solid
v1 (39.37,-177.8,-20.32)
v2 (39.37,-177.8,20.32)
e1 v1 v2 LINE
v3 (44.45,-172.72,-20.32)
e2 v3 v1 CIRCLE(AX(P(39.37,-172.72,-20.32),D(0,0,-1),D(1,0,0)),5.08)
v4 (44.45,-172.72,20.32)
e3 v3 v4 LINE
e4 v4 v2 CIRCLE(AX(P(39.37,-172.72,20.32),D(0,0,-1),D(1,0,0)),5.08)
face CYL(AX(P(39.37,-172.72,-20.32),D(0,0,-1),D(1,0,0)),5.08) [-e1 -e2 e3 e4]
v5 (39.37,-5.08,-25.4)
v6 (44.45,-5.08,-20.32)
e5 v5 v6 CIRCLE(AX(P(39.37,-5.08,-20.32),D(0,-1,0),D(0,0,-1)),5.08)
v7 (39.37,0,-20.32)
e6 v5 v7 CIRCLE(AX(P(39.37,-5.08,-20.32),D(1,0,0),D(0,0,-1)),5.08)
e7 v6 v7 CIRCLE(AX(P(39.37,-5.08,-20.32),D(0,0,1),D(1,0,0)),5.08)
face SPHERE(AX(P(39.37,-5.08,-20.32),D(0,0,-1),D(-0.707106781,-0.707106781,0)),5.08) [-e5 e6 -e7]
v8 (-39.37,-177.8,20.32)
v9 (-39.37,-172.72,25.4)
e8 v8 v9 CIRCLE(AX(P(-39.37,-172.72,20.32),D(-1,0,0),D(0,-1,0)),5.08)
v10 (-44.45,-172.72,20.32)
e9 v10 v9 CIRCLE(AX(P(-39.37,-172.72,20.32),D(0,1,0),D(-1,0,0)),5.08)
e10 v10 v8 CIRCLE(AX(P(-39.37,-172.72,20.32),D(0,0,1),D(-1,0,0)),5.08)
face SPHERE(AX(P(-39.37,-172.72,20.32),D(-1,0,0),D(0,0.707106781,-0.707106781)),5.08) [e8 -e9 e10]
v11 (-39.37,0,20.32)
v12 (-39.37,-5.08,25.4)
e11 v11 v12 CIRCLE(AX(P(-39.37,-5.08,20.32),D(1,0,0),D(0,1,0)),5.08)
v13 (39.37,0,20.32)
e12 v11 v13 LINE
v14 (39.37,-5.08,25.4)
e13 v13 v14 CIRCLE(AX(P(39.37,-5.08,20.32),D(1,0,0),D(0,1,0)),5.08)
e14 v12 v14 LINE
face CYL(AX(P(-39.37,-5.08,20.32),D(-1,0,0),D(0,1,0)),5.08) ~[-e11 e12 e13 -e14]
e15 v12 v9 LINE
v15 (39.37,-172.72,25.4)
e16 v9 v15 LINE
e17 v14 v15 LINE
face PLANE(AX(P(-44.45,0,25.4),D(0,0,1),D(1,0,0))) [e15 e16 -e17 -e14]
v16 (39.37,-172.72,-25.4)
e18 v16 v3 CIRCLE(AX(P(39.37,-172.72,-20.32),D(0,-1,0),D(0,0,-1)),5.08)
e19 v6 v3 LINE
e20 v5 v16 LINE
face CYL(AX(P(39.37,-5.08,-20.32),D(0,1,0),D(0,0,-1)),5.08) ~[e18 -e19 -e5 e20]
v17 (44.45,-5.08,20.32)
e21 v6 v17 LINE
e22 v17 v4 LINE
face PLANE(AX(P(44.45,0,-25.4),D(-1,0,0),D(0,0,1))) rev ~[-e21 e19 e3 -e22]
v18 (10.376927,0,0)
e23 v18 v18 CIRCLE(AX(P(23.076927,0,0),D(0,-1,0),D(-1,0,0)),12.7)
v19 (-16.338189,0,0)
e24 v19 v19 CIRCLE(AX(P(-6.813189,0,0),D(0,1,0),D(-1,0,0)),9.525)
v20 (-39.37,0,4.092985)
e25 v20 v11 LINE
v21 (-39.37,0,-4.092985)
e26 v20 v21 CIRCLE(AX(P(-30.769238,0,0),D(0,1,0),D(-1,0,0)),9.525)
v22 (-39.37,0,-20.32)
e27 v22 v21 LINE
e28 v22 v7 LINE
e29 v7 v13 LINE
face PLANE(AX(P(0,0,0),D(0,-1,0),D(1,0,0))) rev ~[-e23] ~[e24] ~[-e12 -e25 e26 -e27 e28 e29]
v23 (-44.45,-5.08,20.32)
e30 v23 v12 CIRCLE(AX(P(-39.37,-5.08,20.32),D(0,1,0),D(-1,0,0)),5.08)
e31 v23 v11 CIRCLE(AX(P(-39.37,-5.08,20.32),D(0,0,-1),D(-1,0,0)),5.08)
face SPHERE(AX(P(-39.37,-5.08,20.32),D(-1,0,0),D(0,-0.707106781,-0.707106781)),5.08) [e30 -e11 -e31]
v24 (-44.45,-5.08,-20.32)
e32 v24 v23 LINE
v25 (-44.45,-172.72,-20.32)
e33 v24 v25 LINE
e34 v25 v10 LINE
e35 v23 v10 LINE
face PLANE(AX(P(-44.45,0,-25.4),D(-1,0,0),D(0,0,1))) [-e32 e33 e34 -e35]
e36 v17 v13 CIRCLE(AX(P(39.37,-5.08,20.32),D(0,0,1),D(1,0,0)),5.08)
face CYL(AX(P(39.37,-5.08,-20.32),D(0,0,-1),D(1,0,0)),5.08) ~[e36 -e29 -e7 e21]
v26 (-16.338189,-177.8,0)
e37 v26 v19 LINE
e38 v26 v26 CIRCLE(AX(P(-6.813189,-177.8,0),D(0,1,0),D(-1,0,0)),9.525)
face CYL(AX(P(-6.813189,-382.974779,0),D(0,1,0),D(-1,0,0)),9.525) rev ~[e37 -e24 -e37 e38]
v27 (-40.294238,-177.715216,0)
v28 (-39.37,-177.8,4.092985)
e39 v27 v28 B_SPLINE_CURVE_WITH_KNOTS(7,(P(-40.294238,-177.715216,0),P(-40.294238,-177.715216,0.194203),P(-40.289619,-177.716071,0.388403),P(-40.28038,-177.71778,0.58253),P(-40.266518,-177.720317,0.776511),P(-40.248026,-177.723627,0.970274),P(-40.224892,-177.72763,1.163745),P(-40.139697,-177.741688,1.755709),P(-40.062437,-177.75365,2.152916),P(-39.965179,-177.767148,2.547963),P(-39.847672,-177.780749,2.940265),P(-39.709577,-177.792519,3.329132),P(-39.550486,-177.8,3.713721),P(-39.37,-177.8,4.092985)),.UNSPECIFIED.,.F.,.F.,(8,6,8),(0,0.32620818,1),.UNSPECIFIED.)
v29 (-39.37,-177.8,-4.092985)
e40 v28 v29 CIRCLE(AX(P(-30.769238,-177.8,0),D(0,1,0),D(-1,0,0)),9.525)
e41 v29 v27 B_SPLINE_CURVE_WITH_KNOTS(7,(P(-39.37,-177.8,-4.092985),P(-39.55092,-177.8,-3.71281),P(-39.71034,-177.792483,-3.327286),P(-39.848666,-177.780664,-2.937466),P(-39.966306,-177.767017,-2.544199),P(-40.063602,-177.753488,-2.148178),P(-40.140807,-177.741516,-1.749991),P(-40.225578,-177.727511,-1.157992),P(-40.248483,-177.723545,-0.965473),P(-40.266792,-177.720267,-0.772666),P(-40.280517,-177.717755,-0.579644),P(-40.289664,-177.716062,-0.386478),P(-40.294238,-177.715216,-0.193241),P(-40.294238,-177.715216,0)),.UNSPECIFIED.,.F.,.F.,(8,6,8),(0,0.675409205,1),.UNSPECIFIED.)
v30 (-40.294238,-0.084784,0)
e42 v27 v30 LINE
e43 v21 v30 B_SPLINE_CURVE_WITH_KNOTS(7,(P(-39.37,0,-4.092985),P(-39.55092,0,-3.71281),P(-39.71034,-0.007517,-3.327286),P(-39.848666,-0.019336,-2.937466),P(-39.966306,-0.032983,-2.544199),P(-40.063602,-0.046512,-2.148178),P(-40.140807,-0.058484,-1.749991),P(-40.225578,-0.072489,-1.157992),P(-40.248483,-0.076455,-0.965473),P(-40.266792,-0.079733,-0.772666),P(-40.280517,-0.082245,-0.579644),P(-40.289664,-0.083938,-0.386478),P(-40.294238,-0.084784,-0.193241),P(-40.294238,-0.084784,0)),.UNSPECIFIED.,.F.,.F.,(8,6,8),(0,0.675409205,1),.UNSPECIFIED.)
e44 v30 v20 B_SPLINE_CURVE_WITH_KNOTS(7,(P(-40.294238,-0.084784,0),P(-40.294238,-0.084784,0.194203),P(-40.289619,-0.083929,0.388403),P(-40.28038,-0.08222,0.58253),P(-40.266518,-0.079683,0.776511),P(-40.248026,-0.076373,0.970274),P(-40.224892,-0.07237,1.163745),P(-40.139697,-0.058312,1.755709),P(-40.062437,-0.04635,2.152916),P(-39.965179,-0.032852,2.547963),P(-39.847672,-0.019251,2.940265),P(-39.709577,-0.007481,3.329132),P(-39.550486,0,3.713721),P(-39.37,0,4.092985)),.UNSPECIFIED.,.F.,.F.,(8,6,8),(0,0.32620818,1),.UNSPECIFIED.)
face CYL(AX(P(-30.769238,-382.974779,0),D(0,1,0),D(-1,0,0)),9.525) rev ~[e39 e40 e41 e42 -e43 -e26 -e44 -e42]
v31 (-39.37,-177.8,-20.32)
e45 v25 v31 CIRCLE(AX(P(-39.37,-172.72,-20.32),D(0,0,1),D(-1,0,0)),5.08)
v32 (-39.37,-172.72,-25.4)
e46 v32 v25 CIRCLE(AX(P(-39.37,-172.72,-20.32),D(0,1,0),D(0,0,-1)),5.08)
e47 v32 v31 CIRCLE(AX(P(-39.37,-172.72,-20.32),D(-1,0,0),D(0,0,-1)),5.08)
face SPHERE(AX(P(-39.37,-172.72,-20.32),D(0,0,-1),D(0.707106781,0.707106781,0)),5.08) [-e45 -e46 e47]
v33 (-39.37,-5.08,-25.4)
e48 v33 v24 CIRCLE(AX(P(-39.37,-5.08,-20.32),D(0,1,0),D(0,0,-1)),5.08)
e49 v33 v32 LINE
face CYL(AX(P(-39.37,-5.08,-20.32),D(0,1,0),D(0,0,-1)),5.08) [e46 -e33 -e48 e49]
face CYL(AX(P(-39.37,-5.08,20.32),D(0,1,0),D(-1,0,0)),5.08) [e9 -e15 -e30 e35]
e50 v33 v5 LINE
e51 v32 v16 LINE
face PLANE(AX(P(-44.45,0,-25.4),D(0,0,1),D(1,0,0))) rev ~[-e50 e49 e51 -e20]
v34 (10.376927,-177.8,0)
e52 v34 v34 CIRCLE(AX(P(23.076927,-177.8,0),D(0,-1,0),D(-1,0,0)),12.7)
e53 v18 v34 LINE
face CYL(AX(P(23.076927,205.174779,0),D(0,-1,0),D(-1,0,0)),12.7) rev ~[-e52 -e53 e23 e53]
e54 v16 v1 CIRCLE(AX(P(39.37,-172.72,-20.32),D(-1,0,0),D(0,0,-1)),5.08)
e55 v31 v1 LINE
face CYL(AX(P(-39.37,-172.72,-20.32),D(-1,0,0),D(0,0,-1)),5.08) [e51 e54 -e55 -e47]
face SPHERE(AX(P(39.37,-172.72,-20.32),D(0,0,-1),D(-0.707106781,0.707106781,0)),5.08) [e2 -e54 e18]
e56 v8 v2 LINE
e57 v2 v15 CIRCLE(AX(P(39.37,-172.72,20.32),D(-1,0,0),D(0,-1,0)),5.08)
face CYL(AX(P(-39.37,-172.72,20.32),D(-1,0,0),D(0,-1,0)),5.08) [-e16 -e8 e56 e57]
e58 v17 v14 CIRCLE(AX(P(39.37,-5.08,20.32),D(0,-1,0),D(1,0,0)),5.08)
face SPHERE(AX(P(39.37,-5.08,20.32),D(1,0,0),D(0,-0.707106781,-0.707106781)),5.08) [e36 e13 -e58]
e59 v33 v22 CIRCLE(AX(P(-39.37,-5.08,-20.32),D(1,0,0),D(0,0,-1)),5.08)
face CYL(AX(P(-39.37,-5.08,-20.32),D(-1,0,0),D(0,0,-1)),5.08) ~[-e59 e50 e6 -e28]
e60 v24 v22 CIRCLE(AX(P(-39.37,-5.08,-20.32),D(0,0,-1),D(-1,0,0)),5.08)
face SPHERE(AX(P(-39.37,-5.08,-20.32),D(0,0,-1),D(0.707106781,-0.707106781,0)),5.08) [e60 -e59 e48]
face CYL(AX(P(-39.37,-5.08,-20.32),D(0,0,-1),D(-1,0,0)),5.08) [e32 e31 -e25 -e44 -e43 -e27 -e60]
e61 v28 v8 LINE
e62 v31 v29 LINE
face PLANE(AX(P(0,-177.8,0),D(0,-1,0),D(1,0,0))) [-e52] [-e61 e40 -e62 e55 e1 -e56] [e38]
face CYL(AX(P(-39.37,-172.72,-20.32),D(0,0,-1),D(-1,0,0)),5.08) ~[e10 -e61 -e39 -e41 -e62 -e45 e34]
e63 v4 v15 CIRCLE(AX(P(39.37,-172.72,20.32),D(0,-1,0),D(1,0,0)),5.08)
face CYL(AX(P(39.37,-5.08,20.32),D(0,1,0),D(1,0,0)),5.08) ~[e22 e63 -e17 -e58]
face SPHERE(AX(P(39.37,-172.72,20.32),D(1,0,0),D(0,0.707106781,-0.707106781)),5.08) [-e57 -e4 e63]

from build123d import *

# Parameters (mm, degrees)
F0_W         = 88.9
F0_H         = 50.8
F1_DEPTH     = 177.8
F3_D         = 19.05
F5_D         = 25.4
F6_T1_DEPTH  = 167.64
F6_T3_DEPTH  = 78.74
F6_T5_DEPTH  = 40.64
F6_S9_W      = 5.08
F6_S9_H      = 5.08
F6_T10_DEPTH = 5.08
F6_S15_W     = 5.08
F6_S15_H     = 5.08
F6_T16_DEPTH = 5.08
F6_S21_W     = 5.08
F6_S21_H     = 5.08
F6_T22_DEPTH = 5.08
F6_S27_W     = 5.08
F6_S27_H     = 5.08
F6_T28_DEPTH = 5.08
F6_S33_W     = 5.08
F6_S33_H     = 5.08
F6_T34_DEPTH = 5.08
F6_S39_W     = 5.08
F6_S39_H     = 5.08
F6_T40_DEPTH = 5.08
F6_S45_W     = 5.08
F6_S45_H     = 5.08
F6_T46_DEPTH = 5.08
F6_S51_W     = 5.08
F6_S51_H     = 5.08
F6_T52_DEPTH = 5.08


# Not quite as in the source:
# - a fillet or chamfer that OpenCascade refuses, or shapes differently, is made with other operations: its cross-section is extruded or revolved along the edge and cut away or added


with BuildPart() as f1:
    # F0 (on Front) → F1 (new body)
    with BuildSketch(Plane.XZ):
        Rectangle(F0_W, F0_H)
    extrude(amount=F1_DEPTH)

    # F3 (through all)
    with Locations(Plane.XZ.offset(177.8)):
        with Locations((-30.7692382485, 0), (-6.8131890148, 0)):
            Hole(F3_D / 2)

    # F5 (through all)
    with Locations(Plane(origin=(0, 0, 0), x_dir=(1, 0, 0), z_dir=(0, 1, 0))):
        with Locations((23.0769272894, 0)):
            Hole(F5_D / 2)

    # F6: fillet of radius 5.08 on 12 edges, made by hand

    # F6_s2 → F6_t1 (cut)
    with BuildSketch(Plane.XZ.offset(5.08)):
        with BuildLine():
            ThreePointArc((44.45, 20.32), (42.9621024484, 23.9121024484), (39.37, 25.4))
            Line((39.37, 25.4), (44.45, 25.4))
            Line((44.45, 25.4), (44.45, 20.32))
        make_face()
        with BuildLine():
            ThreePointArc((-44.45, 20.32), (-42.9621024484, 23.9121024484), (-39.37, 25.4))
            Line((-39.37, 25.4), (-44.45, 25.4))
            Line((-44.45, 25.4), (-44.45, 20.32))
        make_face()
        with BuildLine():
            ThreePointArc((39.37, -25.4), (42.9621024484, -23.9121024484), (44.45, -20.32))
            Line((44.45, -20.32), (44.45, -25.4))
            Line((44.45, -25.4), (39.37, -25.4))
        make_face()
        with BuildLine():
            ThreePointArc((-39.37, -25.4), (-42.9621024484, -23.9121024484), (-44.45, -20.32))
            Line((-44.45, -20.32), (-44.45, -25.4))
            Line((-44.45, -25.4), (-39.37, -25.4))
        make_face()
    extrude(amount=F6_T1_DEPTH, mode=Mode.SUBTRACT)

    # F6_s4 → F6_t3 (cut)
    with BuildSketch(Plane.YZ.offset(-39.37)):
        with BuildLine():
            ThreePointArc((0, 20.32), (-1.4878975516, 23.9121024484), (-5.08, 25.4))
            Line((-5.08, 25.4), (0, 25.4))
            Line((0, 25.4), (0, 20.32))
        make_face()
        with BuildLine():
            ThreePointArc((-177.8, 20.32), (-176.3121024484, 23.9121024484), (-172.72, 25.4))
            Line((-172.72, 25.4), (-177.8, 25.4))
            Line((-177.8, 25.4), (-177.8, 20.32))
        make_face()
        with BuildLine():
            ThreePointArc((-5.08, -25.4), (-1.4878975516, -23.9121024484), (0, -20.32))
            Line((0, -20.32), (0, -25.4))
            Line((0, -25.4), (-5.08, -25.4))
        make_face()
        with BuildLine():
            ThreePointArc((-172.72, -25.4), (-176.3121024484, -23.9121024484), (-177.8, -20.32))
            Line((-177.8, -20.32), (-177.8, -25.4))
            Line((-177.8, -25.4), (-172.72, -25.4))
        make_face()
    extrude(amount=F6_T3_DEPTH, mode=Mode.SUBTRACT)

    # F6_s6 → F6_t5 (cut)
    with BuildSketch(Plane.XY.offset(-20.32)):
        with BuildLine():
            ThreePointArc((44.45, -5.08), (42.9621024484, -1.4878975516), (39.37, 0))
            Line((39.37, 0), (44.45, 0))
            Line((44.45, 0), (44.45, -5.08))
        make_face()
        with BuildLine():
            ThreePointArc((44.45, -172.72), (42.9621024484, -176.3121024484), (39.37, -177.8))
            Line((39.37, -177.8), (44.45, -177.8))
            Line((44.45, -177.8), (44.45, -172.72))
        make_face()
        with BuildLine():
            ThreePointArc((-44.45, -5.08), (-42.9621024484, -1.4878975516), (-39.37, 0))
            Line((-39.37, 0), (-44.45, 0))
            Line((-44.45, 0), (-44.45, -5.08))
        make_face()
        with BuildLine():
            ThreePointArc((-44.45, -172.72), (-42.9621024484, -176.3121024484), (-39.37, -177.8))
            Line((-39.37, -177.8), (-44.45, -177.8))
            Line((-44.45, -177.8), (-44.45, -172.72))
        make_face()
    extrude(amount=F6_T5_DEPTH, mode=Mode.SUBTRACT)


with BuildPart() as f6_tool8:
    # F6_s9 → F6_t10 (new body)
    with BuildSketch(Plane.YZ.offset(39.37)):
        with Locations((-2.54, 22.86)):
            Rectangle(F6_S9_W, F6_S9_H)
    extrude(amount=F6_T10_DEPTH)

    # F6_s11 → F6_t12 (revolve, cut)
    with BuildSketch(Plane(origin=(39.37, -5.08, 20.32), x_dir=(0, -0.7071067812, -0.7071067812), z_dir=(0, -0.7071067812, 0.7071067812))):
        with BuildLine():
            ThreePointArc((0, -5.08), (5.08, 0), (0, 5.08))
            Line((0, 5.08), (0, -5.08))
        make_face()
    revolve(axis=Axis((39.37, -5.08, 20.32), (1, 0, 0)), mode=Mode.SUBTRACT)


with BuildPart() as f1_1:
    add(f1.part)

    # F6_t7: cut F6_tool8
    add(f6_tool8.part, mode=Mode.SUBTRACT)


with BuildPart() as f6_tool14:
    # F6_s15 → F6_t16 (new body)
    with BuildSketch(Plane.YZ.offset(39.37)):
        with Locations((-175.26, 22.86)):
            Rectangle(F6_S15_W, F6_S15_H)
    extrude(amount=F6_T16_DEPTH)

    # F6_s17 → F6_t18 (revolve, cut)
    with BuildSketch(Plane(origin=(39.37, -172.72, 20.32), x_dir=(0, 0.7071067812, -0.7071067812), z_dir=(0, -0.7071067812, -0.7071067812))):
        with BuildLine():
            ThreePointArc((0, -5.08), (5.08, 0), (0, 5.08))
            Line((0, 5.08), (0, -5.08))
        make_face()
    revolve(axis=Axis((39.37, -172.72, 20.32), (1, 0, 0)), mode=Mode.SUBTRACT)


with BuildPart() as f1_2:
    add(f1_1.part)

    # F6_t13: cut F6_tool14
    add(f6_tool14.part, mode=Mode.SUBTRACT)


with BuildPart() as f6_tool20:
    # F6_s21 → F6_t22 (new body)
    with BuildSketch(Plane.YZ.offset(-39.37)):
        with Locations((-2.54, 22.86)):
            Rectangle(F6_S21_W, F6_S21_H)
    extrude(amount=-F6_T22_DEPTH)

    # F6_s23 → F6_t24 (revolve, cut)
    with BuildSketch(Plane(origin=(-39.37, -5.08, 20.32), x_dir=(0, -0.7071067812, -0.7071067812), z_dir=(0, 0.7071067812, -0.7071067812))):
        with BuildLine():
            ThreePointArc((0, -5.08), (5.08, 0), (0, 5.08))
            Line((0, 5.08), (0, -5.08))
        make_face()
    revolve(axis=Axis((-39.37, -5.08, 20.32), (-1, 0, 0)), mode=Mode.SUBTRACT)


with BuildPart() as f1_3:
    add(f1_2.part)

    # F6_t19: cut F6_tool20
    add(f6_tool20.part, mode=Mode.SUBTRACT)


with BuildPart() as f6_tool26:
    # F6_s27 → F6_t28 (new body)
    with BuildSketch(Plane.YZ.offset(-39.37)):
        with Locations((-175.26, 22.86)):
            Rectangle(F6_S27_W, F6_S27_H)
    extrude(amount=-F6_T28_DEPTH)

    # F6_s29 → F6_t30 (revolve, cut)
    with BuildSketch(Plane(origin=(-39.37, -172.72, 20.32), x_dir=(0, 0.7071067812, -0.7071067812), z_dir=(0, 0.7071067812, 0.7071067812))):
        with BuildLine():
            ThreePointArc((0, -5.08), (5.08, 0), (0, 5.08))
            Line((0, 5.08), (0, -5.08))
        make_face()
    revolve(axis=Axis((-39.37, -172.72, 20.32), (-1, 0, 0)), mode=Mode.SUBTRACT)


with BuildPart() as f1_4:
    add(f1_3.part)

    # F6_t25: cut F6_tool26
    add(f6_tool26.part, mode=Mode.SUBTRACT)


with BuildPart() as f6_tool32:
    # F6_s33 → F6_t34 (new body)
    with BuildSketch(Plane.XY.offset(-20.32)):
        with Locations((41.91, -2.54)):
            Rectangle(F6_S33_W, F6_S33_H)
    extrude(amount=-F6_T34_DEPTH)

    # F6_s35 → F6_t36 (revolve, cut)
    with BuildSketch(Plane(origin=(39.37, -5.08, -20.32), x_dir=(-0.7071067812, -0.7071067812, 0), z_dir=(0.7071067812, -0.7071067812, 0))):
        with BuildLine():
            ThreePointArc((0, -5.08), (5.08, 0), (0, 5.08))
            Line((0, 5.08), (0, -5.08))
        make_face()
    revolve(axis=Axis((39.37, -5.08, -20.32), (0, 0, -1)), mode=Mode.SUBTRACT)


with BuildPart() as f1_5:
    add(f1_4.part)

    # F6_t31: cut F6_tool32
    add(f6_tool32.part, mode=Mode.SUBTRACT)


with BuildPart() as f6_tool38:
    # F6_s39 → F6_t40 (new body)
    with BuildSketch(Plane.XY.offset(-20.32)):
        with Locations((41.91, -175.26)):
            Rectangle(F6_S39_W, F6_S39_H)
    extrude(amount=-F6_T40_DEPTH)

    # F6_s41 → F6_t42 (revolve, cut)
    with BuildSketch(Plane(origin=(39.37, -172.72, -20.32), x_dir=(-0.7071067812, 0.7071067812, 0), z_dir=(-0.7071067812, -0.7071067812, 0))):
        with BuildLine():
            ThreePointArc((0, -5.08), (5.08, 0), (0, 5.08))
            Line((0, 5.08), (0, -5.08))
        make_face()
    revolve(axis=Axis((39.37, -172.72, -20.32), (0, 0, -1)), mode=Mode.SUBTRACT)


with BuildPart() as f1_6:
    add(f1_5.part)

    # F6_t37: cut F6_tool38
    add(f6_tool38.part, mode=Mode.SUBTRACT)


with BuildPart() as f6_tool44:
    # F6_s45 → F6_t46 (new body)
    with BuildSketch(Plane.XY.offset(-20.32)):
        with Locations((-41.91, -2.54)):
            Rectangle(F6_S45_W, F6_S45_H)
    extrude(amount=-F6_T46_DEPTH)

    # F6_s47 → F6_t48 (revolve, cut)
    with BuildSketch(Plane(origin=(-39.37, -5.08, -20.32), x_dir=(0.7071067812, -0.7071067812, 0), z_dir=(0.7071067812, 0.7071067812, 0))):
        with BuildLine():
            ThreePointArc((0, -5.08), (5.08, 0), (0, 5.08))
            Line((0, 5.08), (0, -5.08))
        make_face()
    revolve(axis=Axis((-39.37, -5.08, -20.32), (0, 0, -1)), mode=Mode.SUBTRACT)


with BuildPart() as f1_7:
    add(f1_6.part)

    # F6_t43: cut F6_tool44
    add(f6_tool44.part, mode=Mode.SUBTRACT)


with BuildPart() as f6_tool50:
    # F6_s51 → F6_t52 (new body)
    with BuildSketch(Plane.XY.offset(-20.32)):
        with Locations((-41.91, -175.26)):
            Rectangle(F6_S51_W, F6_S51_H)
    extrude(amount=-F6_T52_DEPTH)

    # F6_s53 → F6_t54 (revolve, cut)
    with BuildSketch(Plane(origin=(-39.37, -172.72, -20.32), x_dir=(0.7071067812, 0.7071067812, 0), z_dir=(-0.7071067812, 0.7071067812, 0))):
        with BuildLine():
            ThreePointArc((0, -5.08), (5.08, 0), (0, 5.08))
            Line((0, 5.08), (0, -5.08))
        make_face()
    revolve(axis=Axis((-39.37, -172.72, -20.32), (0, 0, -1)), mode=Mode.SUBTRACT)


with BuildPart() as f1_8:
    add(f1_7.part)

    # F6_t49: cut F6_tool50
    add(f6_tool50.part, mode=Mode.SUBTRACT)


solid = f1_8.part
